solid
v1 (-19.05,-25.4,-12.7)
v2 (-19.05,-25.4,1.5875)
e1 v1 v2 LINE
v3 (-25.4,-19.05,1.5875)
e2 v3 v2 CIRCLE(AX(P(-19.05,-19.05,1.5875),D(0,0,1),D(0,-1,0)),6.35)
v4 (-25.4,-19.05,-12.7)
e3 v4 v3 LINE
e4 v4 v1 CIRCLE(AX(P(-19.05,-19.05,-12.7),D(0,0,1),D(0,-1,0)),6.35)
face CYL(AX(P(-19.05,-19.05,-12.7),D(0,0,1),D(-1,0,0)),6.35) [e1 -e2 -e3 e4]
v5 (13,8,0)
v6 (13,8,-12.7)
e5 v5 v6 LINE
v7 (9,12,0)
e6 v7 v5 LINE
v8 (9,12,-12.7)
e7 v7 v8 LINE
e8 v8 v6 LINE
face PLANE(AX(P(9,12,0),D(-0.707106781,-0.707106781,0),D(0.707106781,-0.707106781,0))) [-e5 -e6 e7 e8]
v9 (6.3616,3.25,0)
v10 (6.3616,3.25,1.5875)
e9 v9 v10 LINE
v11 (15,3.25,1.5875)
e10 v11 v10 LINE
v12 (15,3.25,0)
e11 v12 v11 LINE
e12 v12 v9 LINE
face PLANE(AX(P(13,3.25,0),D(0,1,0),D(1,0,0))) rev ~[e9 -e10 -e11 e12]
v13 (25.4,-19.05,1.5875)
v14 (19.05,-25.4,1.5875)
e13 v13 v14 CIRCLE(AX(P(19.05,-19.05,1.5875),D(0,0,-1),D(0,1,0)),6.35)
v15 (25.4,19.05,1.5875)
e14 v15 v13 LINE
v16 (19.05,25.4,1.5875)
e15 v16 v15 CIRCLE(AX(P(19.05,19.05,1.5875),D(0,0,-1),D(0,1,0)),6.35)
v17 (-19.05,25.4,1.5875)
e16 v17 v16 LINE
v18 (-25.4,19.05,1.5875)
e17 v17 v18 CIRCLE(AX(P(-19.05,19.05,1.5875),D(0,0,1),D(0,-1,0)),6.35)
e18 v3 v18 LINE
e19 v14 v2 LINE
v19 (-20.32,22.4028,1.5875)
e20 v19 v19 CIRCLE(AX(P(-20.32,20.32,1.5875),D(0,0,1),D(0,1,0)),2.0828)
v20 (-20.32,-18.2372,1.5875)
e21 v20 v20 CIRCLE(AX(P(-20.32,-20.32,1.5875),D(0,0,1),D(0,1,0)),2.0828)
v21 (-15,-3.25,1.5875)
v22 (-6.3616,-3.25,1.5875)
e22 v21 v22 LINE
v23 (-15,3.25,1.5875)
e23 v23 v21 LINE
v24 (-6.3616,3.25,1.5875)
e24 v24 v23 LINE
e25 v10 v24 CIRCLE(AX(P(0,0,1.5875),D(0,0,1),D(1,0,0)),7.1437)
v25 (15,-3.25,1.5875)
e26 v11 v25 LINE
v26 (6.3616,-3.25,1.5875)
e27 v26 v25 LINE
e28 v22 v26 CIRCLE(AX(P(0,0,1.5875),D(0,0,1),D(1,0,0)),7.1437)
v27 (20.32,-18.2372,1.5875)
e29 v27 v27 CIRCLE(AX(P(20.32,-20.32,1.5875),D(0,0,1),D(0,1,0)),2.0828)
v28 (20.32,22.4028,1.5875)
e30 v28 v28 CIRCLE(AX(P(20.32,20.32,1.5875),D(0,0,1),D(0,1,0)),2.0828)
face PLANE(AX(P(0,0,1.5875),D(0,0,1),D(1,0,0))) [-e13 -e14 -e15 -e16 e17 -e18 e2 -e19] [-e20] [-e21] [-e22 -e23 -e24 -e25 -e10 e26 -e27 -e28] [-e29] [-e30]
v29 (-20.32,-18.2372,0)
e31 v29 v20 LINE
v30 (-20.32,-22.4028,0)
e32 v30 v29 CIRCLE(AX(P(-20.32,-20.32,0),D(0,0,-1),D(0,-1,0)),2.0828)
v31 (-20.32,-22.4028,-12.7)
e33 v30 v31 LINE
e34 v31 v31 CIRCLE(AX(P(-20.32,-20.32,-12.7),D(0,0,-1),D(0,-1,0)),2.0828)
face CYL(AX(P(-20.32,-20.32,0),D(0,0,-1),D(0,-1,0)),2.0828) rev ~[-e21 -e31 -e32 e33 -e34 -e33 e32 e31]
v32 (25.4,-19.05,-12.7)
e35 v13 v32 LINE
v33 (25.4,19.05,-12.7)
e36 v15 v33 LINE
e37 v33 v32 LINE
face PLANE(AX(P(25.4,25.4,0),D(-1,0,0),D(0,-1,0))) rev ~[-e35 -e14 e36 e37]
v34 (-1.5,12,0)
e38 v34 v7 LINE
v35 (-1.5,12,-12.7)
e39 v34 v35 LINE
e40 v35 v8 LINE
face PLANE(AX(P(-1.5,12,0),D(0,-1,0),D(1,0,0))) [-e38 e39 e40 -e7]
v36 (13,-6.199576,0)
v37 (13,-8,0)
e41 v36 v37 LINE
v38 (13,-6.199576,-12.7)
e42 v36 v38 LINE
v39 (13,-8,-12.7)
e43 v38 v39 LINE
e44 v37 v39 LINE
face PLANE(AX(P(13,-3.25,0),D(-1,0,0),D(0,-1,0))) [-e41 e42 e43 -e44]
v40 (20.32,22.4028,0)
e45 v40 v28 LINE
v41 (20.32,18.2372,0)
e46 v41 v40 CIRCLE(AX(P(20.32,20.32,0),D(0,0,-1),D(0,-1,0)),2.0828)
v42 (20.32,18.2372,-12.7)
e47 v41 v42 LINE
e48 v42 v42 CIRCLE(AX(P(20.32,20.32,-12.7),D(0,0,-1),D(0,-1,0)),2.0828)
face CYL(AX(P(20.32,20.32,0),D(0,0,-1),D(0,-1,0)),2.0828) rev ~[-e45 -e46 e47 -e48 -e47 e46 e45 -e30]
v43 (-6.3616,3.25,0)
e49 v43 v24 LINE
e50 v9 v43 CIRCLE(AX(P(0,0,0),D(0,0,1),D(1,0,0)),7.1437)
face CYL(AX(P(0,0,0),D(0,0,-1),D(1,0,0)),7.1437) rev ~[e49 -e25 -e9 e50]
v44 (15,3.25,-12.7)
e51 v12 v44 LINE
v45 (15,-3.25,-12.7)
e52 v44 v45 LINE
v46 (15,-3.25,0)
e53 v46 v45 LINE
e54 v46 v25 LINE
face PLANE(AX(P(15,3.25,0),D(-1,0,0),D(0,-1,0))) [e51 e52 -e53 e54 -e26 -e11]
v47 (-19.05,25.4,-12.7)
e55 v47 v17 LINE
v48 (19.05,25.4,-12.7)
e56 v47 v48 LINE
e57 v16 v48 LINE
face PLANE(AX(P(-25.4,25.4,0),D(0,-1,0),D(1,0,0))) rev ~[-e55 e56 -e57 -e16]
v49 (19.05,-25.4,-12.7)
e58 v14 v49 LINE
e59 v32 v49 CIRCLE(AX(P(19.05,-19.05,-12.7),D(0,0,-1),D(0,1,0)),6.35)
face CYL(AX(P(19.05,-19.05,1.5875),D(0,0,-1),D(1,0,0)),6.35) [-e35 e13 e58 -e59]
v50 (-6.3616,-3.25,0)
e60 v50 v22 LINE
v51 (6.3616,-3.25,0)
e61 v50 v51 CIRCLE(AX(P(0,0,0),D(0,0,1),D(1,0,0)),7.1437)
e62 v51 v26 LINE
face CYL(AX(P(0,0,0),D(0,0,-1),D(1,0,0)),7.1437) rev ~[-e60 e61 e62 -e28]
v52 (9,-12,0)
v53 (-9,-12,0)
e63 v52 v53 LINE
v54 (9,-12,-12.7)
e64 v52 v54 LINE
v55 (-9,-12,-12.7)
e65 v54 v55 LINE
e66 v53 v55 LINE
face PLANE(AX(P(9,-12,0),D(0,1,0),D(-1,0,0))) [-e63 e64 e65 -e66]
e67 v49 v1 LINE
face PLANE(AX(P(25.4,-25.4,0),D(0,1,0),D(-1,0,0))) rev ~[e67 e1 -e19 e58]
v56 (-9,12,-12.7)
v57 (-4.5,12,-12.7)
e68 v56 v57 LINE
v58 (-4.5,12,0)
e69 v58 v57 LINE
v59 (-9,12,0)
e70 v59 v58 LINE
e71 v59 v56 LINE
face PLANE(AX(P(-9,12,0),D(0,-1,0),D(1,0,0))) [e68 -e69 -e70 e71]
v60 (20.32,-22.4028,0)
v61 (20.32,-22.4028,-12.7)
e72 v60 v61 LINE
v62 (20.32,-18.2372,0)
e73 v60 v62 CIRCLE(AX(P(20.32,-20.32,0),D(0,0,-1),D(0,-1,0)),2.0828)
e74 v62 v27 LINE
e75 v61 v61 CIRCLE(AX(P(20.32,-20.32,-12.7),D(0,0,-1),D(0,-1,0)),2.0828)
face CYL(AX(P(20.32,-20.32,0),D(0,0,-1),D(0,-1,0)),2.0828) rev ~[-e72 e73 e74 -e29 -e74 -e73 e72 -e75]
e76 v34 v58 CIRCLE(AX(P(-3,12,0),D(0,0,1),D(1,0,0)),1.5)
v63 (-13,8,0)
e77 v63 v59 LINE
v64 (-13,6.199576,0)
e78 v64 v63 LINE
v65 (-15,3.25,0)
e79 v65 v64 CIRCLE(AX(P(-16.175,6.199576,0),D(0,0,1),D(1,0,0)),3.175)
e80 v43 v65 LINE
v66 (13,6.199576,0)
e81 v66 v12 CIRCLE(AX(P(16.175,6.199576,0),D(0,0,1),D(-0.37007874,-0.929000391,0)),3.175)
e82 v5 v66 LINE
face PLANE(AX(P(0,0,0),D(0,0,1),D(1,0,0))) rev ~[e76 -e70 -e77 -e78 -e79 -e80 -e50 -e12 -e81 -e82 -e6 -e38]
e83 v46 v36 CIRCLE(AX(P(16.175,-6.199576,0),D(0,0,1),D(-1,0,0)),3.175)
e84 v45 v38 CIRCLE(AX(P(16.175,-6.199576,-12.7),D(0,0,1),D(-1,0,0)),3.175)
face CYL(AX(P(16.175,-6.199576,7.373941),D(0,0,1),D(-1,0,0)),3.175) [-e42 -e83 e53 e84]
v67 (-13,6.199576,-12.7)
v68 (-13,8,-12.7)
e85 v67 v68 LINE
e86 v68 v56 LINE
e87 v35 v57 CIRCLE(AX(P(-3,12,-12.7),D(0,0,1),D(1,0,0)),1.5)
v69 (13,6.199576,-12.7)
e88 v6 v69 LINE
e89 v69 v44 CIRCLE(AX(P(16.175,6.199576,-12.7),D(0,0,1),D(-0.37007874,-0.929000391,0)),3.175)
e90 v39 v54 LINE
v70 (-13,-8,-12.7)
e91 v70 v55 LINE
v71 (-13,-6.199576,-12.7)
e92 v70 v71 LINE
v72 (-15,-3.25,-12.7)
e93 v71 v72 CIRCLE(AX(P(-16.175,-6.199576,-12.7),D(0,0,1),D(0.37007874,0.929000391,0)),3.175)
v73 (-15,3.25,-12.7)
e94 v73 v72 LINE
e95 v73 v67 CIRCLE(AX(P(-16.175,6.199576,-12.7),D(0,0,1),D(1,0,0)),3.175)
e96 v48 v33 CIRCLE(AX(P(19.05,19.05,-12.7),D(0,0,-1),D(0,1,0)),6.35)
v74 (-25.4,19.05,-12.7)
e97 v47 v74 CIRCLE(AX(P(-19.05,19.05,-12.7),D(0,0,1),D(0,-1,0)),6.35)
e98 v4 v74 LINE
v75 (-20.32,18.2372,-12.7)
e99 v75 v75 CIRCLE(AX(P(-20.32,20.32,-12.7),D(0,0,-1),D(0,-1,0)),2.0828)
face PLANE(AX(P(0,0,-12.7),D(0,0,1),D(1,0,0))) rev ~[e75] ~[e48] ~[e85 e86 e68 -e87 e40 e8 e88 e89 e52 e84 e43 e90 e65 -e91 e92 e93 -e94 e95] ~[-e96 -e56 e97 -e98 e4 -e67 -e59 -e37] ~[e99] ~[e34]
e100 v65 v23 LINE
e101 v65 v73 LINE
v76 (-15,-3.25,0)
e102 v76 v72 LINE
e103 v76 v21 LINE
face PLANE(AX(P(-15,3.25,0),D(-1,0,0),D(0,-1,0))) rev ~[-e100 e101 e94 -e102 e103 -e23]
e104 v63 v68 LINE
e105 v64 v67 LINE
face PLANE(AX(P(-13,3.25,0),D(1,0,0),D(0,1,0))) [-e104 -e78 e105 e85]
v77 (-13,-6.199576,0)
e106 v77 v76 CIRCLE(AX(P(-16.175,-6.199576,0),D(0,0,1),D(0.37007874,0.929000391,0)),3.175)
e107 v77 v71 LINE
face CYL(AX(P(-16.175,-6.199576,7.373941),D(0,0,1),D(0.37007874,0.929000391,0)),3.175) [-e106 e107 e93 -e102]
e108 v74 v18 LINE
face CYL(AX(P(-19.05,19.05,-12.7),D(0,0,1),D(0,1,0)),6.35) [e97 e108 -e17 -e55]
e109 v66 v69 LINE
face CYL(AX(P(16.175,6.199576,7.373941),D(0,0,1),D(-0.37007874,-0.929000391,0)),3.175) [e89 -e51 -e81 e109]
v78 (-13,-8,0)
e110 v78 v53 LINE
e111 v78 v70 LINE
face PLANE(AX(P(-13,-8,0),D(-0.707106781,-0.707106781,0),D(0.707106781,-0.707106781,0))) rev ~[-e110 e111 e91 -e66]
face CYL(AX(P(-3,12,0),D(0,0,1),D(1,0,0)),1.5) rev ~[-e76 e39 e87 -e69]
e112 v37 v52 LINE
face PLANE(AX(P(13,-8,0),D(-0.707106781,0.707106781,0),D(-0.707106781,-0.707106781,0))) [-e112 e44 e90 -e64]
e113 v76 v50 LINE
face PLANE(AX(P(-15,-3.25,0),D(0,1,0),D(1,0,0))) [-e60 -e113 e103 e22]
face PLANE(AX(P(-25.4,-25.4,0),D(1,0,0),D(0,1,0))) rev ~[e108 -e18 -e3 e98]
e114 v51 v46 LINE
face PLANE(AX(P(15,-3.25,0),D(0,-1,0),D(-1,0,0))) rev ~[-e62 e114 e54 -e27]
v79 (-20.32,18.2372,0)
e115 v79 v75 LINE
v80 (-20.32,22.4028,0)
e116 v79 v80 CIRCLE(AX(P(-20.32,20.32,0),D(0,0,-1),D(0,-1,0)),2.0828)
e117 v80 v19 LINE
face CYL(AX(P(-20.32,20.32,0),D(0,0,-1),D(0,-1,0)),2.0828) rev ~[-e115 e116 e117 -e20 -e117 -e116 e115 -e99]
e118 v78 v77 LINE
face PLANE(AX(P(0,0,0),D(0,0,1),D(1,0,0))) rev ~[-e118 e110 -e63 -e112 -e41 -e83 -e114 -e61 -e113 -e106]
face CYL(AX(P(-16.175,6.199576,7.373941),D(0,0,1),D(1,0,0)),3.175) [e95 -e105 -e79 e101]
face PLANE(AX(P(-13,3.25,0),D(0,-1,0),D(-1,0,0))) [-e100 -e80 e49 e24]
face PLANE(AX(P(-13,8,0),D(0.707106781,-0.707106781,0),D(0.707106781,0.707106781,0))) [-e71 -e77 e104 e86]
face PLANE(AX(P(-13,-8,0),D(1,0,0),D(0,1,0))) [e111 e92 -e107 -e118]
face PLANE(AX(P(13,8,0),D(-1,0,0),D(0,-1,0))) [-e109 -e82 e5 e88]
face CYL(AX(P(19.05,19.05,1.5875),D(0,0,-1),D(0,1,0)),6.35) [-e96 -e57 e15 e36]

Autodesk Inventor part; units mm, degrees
ref_plane "YZ Plane" through (0, 0, 0) normal (1, 0, 0) x (0, 1, 0)
ref_plane "XZ Plane" through (0, 0, 0) normal (0, 1, 0) x (-1, 0, 0)
ref_plane "XY Plane" through (0, 0, 0) normal (0, 0, 1) x (1, 0, 0)
sketch "Sketch1" plane through (0, 0, 0) normal (0, 0, 1) x (1, 0, 0)
  line L0 (-13, 12) -> (13, 12)
  line L1 (13, 12) -> (13, -12)
  line L2 (13, -12) -> (-13, -12)
  line L3 (-13, -12) -> (-13, 12)
  line L4 (-13, 3.25) -> (-15, 3.25)
  line L5 (-15, 3.25) -> (-15, -3.25)
  line L6 (-15, -3.25) -> (-13, -3.25)
  line L7 (-13, -3.25) -> (-13, 3.25)
  line L8 (13, 3.25) -> (15, 3.25)
  line L9 (15, 3.25) -> (15, -3.25)
  line L10 (15, -3.25) -> (13, -3.25)
  line L11 (13, -3.25) -> (13, 3.25)
  line L12 (-25.4, 25.4) -> (25.4, 25.4)
  line L13 (25.4, 25.4) -> (25.4, -25.4)
  line L14 (25.4, -25.4) -> (-25.4, -25.4)
  line L15 (-25.4, -25.4) -> (-25.4, 25.4)
  circle A0 centre (0, 0) radius 7.1437
  circle A1 centre (-3, 12) radius 1.5
  line L16 (-13, 8) -> (-9, 12)
  line L17 (9, 12) -> (13, 8)
  line L18 (13, -8) -> (9, -12)
  line L19 (-13, -8) -> (-9, -12)
  line L20 (-13, 3.25) -> (13, 3.25)
  line L21 (13, -3.25) -> (-13, -3.25)
  point P0 (-14, 3.25)
  point P1 (14, 3.25)
  point P2 (-14, -3.25)
  point P3 (14, -3.25)
  point P4 (-20.32, 20.32)
  point P5 (20.32, 20.32)
  point P6 (20.32, -20.32)
  point P7 (-20.32, -20.32)
  dimension "d0" = 24
  dimension "d1" = 12
  dimension "d2" = 26
  dimension "d3" = 13
  dimension "d4" = 2
  dimension "d5" = 6.5
  dimension "d6" = 3.25
  dimension "d7" = 2
  dimension "d8" = 14.2875
  dimension "d9" = 50.8
  dimension "d10" = 25.4
  dimension "d11" = 50.8
  dimension "d12" = 25.4
  dimension "d13" = 3
  dimension "d14" = 10
  dimension "d15" = 4
  dimension "d16" = 4
  dimension "d17" = 4
  dimension "d18" = 4
  dimension "d19" = 4
  dimension "d20" = 5.08
  dimension "d21" = 5.08
  dimension "d22" = 5.08
  dimension "d23" = 5.08
  dimension "d34" = 40.64
  dimension "d35" = 40.64
extrude "Extrusion1" add sketch "Sketch1" against normal blind 12.7 contours L0 L16 L3 | L0 L1 L17 | L19 L2 L3 | L18 L1 L2 | L12 L13 L14 L15
fillet "Fillet1" radius 3.175 4 edges at (-13, -3.25, -6.35) (-13, 3.25, -6.35) (13, 3.25, -6.35) (13, -3.25, -6.35)
extrude "Extrusion2" add sketch "Sketch1" along normal blind 1.5875 contours L0 L16 L3 | L0 A1 L17 L1 L20 A0 L3 L16 | A1 L0 | L0 A1 | L21 A0 L1 L18 L2 L19 L3 | L0 L1 L17 | L19 L2 L3 | L18 L1 L2 | L12 L13 L14 L15
hole "Hole1" at (-20.32, 20.32, 0) at (20.32, 20.32, 0) at (20.32, -20.32, 0) at (-20.32, -20.32, 0) direction (0, 0, -1) diameter 4.1656 end through all
thread "Thread1" size "10-32 UNF" class "2B" standard "ANSI Unified Screw Threads" full length
thread "Thread2" size "10-32 UNF" class "2B" standard "ANSI Unified Screw Threads" full length
thread "Thread3" size "10-32 UNF" class "2B" standard "ANSI Unified Screw Threads" full length
thread "Thread4" size "10-32 UNF" class "2B" standard "ANSI Unified Screw Threads" full length
hole "Hole2" at (20.32, 20.32, 0) at (-20.32, 20.32, 0) at (-20.32, -20.32, 0) at (20.32, -20.32, 0) direction (0, 0, 1) diameter 4.1656 end through all
fillet "Fillet2" radius 6.35 4 edges at (25.4, 25.4, -5.5563) (-25.4, 25.4, -5.5562) (-25.4, -25.4, -5.5562) (25.4, -25.4, -5.5563)
equation "\"d1\" = 0.5 * d0"
equation "\"d3\" = 0.5 * d2"
equation "\"d6\" = 0.5 * d5"
equation "\"d7\" = d4"
equation "\"d10\" = 0.5 * d9"
equation "\"d12\" = 0.5 * d11"
equation "\"d16\" = d15"
equation "\"d17\" = d15"
equation "\"d18\" = d15"
equation "\"d19\" = d15"
equation "\"d22\" = d21"
equation "\"d23\" = d21"
properties part number "BD gearbox mount block 2"
